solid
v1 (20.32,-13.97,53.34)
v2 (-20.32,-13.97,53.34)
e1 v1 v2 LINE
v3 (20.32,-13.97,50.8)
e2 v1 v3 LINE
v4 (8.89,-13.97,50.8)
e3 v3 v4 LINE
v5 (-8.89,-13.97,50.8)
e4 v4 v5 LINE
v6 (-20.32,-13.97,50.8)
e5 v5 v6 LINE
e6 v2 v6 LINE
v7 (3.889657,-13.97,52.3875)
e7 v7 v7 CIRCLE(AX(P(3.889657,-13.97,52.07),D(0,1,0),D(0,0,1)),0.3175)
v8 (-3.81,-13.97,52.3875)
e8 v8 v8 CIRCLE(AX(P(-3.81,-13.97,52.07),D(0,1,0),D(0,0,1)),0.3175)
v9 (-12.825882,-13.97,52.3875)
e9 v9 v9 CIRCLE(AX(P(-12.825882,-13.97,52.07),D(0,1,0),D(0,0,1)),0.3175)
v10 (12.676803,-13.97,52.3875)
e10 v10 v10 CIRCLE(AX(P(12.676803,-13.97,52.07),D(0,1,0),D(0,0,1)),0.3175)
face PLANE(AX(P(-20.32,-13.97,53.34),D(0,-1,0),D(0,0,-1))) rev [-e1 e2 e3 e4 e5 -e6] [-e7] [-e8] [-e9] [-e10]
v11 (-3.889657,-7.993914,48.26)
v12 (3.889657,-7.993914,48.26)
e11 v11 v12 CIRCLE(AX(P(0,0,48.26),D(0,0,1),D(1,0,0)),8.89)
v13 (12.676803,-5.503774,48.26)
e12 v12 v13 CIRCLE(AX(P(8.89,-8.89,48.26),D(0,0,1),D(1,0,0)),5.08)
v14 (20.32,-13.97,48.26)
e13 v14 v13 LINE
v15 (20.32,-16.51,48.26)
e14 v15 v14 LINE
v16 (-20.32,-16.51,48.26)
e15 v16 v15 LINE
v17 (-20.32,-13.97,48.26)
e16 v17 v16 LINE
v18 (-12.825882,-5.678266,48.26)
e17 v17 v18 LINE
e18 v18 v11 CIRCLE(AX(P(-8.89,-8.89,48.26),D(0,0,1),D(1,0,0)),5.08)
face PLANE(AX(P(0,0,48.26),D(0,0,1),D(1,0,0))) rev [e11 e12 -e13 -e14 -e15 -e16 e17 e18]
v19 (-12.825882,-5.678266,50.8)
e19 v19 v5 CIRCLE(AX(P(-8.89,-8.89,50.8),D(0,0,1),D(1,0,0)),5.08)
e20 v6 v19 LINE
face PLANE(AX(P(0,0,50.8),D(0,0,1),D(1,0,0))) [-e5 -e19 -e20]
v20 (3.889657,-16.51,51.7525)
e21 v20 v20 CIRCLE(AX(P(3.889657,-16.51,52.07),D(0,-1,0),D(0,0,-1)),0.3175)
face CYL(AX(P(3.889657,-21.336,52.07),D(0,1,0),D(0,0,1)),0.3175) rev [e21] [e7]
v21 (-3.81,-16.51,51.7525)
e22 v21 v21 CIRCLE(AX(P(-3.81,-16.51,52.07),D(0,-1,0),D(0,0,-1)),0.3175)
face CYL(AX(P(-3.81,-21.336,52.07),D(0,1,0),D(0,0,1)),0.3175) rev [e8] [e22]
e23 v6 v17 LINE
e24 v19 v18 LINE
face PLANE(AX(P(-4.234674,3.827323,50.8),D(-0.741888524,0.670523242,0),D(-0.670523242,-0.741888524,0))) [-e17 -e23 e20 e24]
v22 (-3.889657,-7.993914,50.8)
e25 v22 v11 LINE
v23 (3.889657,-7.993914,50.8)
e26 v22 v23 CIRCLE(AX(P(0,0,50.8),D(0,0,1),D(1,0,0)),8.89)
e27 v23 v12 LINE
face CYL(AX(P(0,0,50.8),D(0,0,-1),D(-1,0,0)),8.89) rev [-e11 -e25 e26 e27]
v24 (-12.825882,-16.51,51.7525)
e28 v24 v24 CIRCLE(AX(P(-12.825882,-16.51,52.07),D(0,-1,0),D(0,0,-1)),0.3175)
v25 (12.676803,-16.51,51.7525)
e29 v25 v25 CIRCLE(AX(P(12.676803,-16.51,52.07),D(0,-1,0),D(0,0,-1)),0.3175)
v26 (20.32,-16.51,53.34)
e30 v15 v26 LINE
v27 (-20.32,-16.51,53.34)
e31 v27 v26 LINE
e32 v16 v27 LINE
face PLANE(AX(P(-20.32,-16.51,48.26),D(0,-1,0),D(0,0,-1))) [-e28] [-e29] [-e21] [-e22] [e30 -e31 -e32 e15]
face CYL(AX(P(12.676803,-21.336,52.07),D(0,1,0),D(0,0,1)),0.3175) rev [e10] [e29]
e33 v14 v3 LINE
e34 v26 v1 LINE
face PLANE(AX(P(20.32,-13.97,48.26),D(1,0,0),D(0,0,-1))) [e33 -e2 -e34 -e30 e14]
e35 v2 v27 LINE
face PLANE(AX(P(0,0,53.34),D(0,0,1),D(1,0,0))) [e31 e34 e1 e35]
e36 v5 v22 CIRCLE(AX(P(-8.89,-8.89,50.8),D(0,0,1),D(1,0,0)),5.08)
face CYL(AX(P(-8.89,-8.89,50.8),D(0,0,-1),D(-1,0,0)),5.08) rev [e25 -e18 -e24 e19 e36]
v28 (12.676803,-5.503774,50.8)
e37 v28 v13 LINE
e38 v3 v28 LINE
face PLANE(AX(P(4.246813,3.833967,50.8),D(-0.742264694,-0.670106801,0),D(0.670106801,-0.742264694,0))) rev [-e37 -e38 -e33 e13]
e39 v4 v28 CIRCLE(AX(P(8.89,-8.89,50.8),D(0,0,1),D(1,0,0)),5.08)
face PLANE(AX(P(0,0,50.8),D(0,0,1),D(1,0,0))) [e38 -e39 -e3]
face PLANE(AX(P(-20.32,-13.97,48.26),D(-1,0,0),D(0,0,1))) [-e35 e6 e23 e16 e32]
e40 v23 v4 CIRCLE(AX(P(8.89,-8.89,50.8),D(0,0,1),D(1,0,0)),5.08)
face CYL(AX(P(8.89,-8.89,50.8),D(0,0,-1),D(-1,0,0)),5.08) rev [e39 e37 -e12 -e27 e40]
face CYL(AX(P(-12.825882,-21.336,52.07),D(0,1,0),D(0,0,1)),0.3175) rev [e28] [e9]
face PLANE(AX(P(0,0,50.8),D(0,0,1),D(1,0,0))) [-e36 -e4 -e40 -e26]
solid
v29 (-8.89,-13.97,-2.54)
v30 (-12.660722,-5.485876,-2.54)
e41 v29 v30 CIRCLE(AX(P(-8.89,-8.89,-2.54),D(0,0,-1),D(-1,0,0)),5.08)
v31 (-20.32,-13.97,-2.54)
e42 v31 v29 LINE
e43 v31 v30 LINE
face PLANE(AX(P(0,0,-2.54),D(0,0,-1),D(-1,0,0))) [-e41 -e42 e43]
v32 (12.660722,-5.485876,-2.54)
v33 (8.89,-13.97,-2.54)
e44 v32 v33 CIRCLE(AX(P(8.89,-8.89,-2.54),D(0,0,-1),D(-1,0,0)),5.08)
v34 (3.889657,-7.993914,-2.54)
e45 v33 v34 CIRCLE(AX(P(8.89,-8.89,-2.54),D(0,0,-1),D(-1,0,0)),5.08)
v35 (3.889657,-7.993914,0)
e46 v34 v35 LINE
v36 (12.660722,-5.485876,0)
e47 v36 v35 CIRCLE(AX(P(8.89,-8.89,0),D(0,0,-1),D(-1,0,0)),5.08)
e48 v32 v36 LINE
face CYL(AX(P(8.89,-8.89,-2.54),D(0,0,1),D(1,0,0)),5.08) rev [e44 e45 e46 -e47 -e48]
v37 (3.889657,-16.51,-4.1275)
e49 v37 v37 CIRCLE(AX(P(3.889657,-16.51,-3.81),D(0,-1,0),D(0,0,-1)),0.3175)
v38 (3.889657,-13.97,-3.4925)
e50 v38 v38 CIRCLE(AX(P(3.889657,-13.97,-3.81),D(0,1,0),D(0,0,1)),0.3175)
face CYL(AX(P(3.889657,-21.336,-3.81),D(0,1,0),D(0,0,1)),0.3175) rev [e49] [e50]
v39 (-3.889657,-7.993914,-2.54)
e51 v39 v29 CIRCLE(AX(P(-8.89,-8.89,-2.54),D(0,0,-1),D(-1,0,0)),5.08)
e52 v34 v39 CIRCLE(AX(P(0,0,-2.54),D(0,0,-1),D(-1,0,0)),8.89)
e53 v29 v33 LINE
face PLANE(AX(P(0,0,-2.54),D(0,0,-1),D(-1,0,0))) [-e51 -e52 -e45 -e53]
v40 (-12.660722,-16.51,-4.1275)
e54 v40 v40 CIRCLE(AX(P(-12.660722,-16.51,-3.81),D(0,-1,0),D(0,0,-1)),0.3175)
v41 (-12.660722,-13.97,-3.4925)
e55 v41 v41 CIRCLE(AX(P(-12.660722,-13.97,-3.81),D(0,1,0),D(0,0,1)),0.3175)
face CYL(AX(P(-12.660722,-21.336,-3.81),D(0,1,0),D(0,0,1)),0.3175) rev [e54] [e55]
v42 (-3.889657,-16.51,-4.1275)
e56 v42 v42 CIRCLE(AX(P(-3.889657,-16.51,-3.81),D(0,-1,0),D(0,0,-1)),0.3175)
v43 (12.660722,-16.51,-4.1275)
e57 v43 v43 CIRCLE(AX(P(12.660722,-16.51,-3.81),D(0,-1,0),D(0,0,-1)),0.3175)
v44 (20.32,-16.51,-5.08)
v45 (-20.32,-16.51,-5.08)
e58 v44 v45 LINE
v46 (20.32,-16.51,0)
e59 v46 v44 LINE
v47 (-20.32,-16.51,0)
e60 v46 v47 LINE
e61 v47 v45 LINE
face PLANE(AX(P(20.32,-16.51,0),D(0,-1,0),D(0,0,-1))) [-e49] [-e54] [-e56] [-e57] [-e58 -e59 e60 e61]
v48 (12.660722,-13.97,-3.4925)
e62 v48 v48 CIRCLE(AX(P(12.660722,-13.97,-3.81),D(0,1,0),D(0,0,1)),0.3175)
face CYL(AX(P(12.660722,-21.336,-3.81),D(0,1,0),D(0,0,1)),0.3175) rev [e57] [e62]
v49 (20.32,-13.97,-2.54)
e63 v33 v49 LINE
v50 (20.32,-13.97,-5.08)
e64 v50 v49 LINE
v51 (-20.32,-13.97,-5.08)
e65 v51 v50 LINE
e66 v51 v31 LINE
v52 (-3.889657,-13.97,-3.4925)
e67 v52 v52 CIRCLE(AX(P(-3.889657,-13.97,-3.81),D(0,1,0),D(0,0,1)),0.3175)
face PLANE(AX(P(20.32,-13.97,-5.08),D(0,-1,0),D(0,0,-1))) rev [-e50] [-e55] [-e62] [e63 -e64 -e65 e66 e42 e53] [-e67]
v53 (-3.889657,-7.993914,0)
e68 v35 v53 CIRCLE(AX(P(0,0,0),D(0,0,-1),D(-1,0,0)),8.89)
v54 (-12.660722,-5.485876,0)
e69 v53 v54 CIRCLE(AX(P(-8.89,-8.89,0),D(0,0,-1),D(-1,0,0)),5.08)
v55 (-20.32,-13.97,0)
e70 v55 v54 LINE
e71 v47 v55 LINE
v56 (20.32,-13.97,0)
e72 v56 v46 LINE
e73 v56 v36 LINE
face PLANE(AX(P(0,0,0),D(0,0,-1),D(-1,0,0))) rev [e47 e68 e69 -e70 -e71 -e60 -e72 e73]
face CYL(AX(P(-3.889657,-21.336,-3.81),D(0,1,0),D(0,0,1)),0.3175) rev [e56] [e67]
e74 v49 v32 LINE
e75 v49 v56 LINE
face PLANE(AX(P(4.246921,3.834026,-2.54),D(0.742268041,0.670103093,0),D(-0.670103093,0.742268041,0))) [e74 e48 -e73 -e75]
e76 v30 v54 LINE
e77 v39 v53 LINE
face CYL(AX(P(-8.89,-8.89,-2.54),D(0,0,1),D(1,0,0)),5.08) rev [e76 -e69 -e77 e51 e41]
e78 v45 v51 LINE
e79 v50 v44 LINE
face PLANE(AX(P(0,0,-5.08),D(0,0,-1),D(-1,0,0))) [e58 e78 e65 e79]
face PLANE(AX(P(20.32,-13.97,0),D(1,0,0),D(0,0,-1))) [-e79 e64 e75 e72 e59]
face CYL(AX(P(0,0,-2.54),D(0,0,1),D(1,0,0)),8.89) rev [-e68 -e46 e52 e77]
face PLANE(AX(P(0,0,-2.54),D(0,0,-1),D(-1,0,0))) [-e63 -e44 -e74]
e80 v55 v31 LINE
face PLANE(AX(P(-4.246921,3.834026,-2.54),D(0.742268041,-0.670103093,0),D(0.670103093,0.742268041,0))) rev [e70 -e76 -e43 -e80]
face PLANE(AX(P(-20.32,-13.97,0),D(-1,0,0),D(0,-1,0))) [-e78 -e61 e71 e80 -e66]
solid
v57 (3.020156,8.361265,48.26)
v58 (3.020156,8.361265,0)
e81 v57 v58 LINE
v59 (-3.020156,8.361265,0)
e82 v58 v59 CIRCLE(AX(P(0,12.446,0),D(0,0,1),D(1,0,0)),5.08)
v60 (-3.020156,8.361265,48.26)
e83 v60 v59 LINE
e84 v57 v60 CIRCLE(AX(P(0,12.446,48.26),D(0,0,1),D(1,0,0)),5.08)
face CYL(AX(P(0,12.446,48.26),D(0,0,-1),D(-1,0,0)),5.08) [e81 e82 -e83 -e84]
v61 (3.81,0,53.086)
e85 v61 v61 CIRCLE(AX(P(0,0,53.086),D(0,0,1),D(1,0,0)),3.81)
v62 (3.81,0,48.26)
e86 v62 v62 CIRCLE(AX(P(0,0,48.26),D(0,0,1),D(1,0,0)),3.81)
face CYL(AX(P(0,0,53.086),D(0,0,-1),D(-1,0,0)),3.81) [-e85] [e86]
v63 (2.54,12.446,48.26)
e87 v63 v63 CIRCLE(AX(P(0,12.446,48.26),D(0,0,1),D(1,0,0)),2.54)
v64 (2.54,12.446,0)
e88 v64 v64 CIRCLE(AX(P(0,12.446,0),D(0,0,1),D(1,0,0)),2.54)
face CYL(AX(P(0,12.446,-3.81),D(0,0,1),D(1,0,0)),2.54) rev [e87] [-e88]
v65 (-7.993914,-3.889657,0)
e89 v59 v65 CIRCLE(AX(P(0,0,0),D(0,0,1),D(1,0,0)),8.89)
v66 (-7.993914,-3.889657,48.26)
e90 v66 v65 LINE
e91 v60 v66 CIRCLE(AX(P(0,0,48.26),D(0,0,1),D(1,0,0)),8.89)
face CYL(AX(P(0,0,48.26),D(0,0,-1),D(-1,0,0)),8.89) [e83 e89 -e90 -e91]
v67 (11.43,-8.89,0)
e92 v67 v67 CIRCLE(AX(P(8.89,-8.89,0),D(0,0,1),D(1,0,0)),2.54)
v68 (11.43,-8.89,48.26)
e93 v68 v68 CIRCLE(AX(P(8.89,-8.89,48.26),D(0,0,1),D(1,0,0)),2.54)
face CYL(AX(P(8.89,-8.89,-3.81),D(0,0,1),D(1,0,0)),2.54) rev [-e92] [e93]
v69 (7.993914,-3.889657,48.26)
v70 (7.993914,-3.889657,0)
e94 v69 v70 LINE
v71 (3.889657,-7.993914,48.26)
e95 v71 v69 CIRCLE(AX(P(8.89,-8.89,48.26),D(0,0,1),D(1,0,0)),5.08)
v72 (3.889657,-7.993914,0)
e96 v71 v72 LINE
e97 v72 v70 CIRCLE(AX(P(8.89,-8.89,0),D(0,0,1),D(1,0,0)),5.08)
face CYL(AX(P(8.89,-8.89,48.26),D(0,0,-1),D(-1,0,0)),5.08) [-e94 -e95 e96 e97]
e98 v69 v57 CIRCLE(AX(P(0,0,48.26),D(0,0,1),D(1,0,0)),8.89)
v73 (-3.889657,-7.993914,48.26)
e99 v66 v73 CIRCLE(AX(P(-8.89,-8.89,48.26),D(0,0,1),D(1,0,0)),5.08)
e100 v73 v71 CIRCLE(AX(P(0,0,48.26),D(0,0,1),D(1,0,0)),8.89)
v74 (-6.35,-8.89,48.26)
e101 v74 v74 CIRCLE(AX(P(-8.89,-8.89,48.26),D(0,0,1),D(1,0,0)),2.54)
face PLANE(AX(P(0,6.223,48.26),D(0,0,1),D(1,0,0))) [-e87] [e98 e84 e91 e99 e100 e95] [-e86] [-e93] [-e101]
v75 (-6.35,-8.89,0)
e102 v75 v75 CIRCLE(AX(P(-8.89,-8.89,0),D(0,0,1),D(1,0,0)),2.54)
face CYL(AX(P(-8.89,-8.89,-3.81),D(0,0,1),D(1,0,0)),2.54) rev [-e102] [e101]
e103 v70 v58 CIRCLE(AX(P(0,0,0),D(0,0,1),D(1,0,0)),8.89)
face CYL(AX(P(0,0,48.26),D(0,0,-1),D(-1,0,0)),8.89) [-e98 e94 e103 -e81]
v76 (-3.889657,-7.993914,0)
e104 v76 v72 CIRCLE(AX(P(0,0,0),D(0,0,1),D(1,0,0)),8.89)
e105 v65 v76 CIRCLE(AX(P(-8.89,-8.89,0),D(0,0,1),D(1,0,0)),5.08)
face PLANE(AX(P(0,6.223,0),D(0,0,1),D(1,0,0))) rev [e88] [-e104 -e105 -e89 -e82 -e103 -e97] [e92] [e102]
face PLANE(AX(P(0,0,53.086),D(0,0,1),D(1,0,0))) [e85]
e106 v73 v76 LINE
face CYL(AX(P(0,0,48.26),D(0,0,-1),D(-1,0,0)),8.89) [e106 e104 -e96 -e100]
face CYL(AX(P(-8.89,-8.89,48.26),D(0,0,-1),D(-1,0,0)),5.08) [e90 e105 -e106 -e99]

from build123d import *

# Parameters (mm, degrees)
BOSS_EXTRUDE1_DEPTH   = 48.26
SKETCH2_R             = 2.54
CUT_EXTRUDE1_DEPTH    = 52.07
BOSS_EXTRUDE2_DEPTH   = 2.54
BOSS_EXTRUDE5_DEPTH   = 2.54
BOSS_EXTRUDE5_2_DEPTH = 2.54
BOSS_EXTRUDE5_3_DEPTH = 2.54
SKETCH6_W             = 40.64
SKETCH6_H             = 2.54
BOSS_EXTRUDE6_DEPTH   = 2.54
SKETCH7_W             = 40.64
SKETCH7_H             = 2.54
BOSS_EXTRUDE7_DEPTH   = 2.54
SKETCH8_W             = 40.64
SKETCH8_H             = 2.54
BOSS_EXTRUDE8_DEPTH   = 2.54
SKETCH9_W             = 40.64
SKETCH9_H             = 2.54
BOSS_EXTRUDE9_DEPTH   = 2.54
SKETCH10_R            = 0.3175
CUT_EXTRUDE2_DEPTH    = 7.366
SKETCH11_R            = 0.3175
CUT_EXTRUDE3_DEPTH    = 7.366
SKETCH12_R            = 3.81
BOSS_EXTRUDE10_DEPTH  = 4.826


# Read off the part's stored shape, not the designer's step: Boss-Extrude2
with BuildPart() as part:
    # Sketch1 → Boss-Extrude1 (new body)
    with BuildSketch(Plane.XY):
        with BuildLine():
            ThreePointArc((-3.020156036, 8.361265306), (-8.237032921, 3.344157391), (-7.993914493, -3.889656935))
            ThreePointArc((-7.993914493, -3.889656935), (-12.482102448, -12.482102448), (-3.889656935, -7.993914493))
            ThreePointArc((-3.889656935, -7.993914493), (0, -8.89), (3.889656935, -7.993914493))
            ThreePointArc((3.889656935, -7.993914493), (12.482102448, -12.482102448), (7.993914493, -3.889656935))
            ThreePointArc((7.993914493, -3.889656935), (8.237032921, 3.344157391), (3.020156036, 8.361265306))
            ThreePointArc((3.020156036, 8.361265306), (0, 17.526), (-3.020156036, 8.361265306))
        make_face()
    extrude(amount=BOSS_EXTRUDE1_DEPTH)

    # Sketch2 → Cut-Extrude1 (cut)
    with BuildSketch(Plane.XY.offset(48.26)):
        with Locations((0, 12.446)):
            Circle(SKETCH2_R)
        with Locations((-8.89, -8.89)):
            Circle(SKETCH2_R)
        with Locations((8.89, -8.89)):
            Circle(SKETCH2_R)
    extrude(amount=-CUT_EXTRUDE1_DEPTH, mode=Mode.SUBTRACT)



with BuildPart() as body_2:
    # Boss-Extrude2 outline → Boss-Extrude2 (new body)
    with BuildSketch(Plane.XY.offset(48.26)):
        with BuildLine():
            ThreePointArc((-8.89, -13.97), (-13.479227022, -11.068392835), (-12.825881599, -5.678265883))
            Line((-12.825881599, -5.678265883), (-20.32, -13.97))
            Line((-20.32, -13.97), (-8.89, -13.97))
        make_face()
        with BuildLine():
            ThreePointArc((12.676802642, -5.503774115), (13.527263606, -10.964171221), (8.89, -13.97))
            Line((8.89, -13.97), (20.32, -13.97))
            Line((20.32, -13.97), (12.676802642, -5.503774115))
        make_face()
        with BuildLine():
            ThreePointArc((-3.889656935, -7.993914493), (-4.99394338, -12.149929879), (-8.89, -13.97))
            Line((-8.89, -13.97), (8.89, -13.97))
            ThreePointArc((8.89, -13.97), (4.99394338, -12.149929879), (3.889656935, -7.993914493))
            ThreePointArc((3.889656935, -7.993914493), (0, -8.89), (-3.889656935, -7.993914493))
        make_face()
    extrude(amount=BOSS_EXTRUDE2_DEPTH)


with BuildPart() as body_3:
    # Sketch5 → Boss-Extrude5 (new body)
    with BuildSketch(Plane(origin=(0, 0, 0), x_dir=(-1, 0, 0), z_dir=(0, 0, -1))):
        with BuildLine():
            Line((-12.660721649, -5.485876288), (-20.32, -13.97))
            Line((-20.32, -13.97), (-8.89, -13.97))
            ThreePointArc((-8.89, -13.97), (-13.532162667, -10.953183407), (-12.660721649, -5.485876288))
        make_face()
    extrude(amount=BOSS_EXTRUDE5_DEPTH)



with BuildPart() as body_4:
    # Sketch5 → Boss-Extrude5 2 (new body)
    with BuildSketch(Plane(origin=(0, 0, 0), x_dir=(-1, 0, 0), z_dir=(0, 0, -1))):
        with BuildLine():
            ThreePointArc((-3.889656935, -7.993914493), (-4.99394338, -12.149929879), (-8.89, -13.97))
            Line((-8.89, -13.97), (8.89, -13.97))
            ThreePointArc((8.89, -13.97), (4.99394338, -12.149929879), (3.889656935, -7.993914493))
            ThreePointArc((3.889656935, -7.993914493), (0, -8.89), (-3.889656935, -7.993914493))
        make_face()
    extrude(amount=BOSS_EXTRUDE5_2_DEPTH)


with BuildPart() as body_5:
    # Sketch5 → Boss-Extrude5 3 (new body)
    with BuildSketch(Plane(origin=(0, 0, 0), x_dir=(-1, 0, 0), z_dir=(0, 0, -1))):
        with BuildLine():
            ThreePointArc((12.660721649, -5.485876288), (13.532162667, -10.953183407), (8.89, -13.97))
            Line((8.89, -13.97), (20.32, -13.97))
            Line((20.32, -13.97), (12.660721649, -5.485876288))
        make_face()
    extrude(amount=BOSS_EXTRUDE5_3_DEPTH)


with BuildPart() as part_1:
    add(part.part)

    add(body_2.part)  # Boss-Extrude6 merges body 2
    # Sketch6 → Boss-Extrude6 (add)
    with BuildSketch(Plane.XY.offset(50.8)):
        with Locations((0, -15.24)):
            Rectangle(SKETCH6_W, SKETCH6_H)
    extrude(amount=-BOSS_EXTRUDE6_DEPTH)

    # Sketch7 → Boss-Extrude7 (add)
    with BuildSketch(Plane.XY.offset(50.8)):
        with Locations((0, -15.24)):
            Rectangle(SKETCH7_W, SKETCH7_H)
    extrude(amount=BOSS_EXTRUDE7_DEPTH)

    # Sketch11 → Cut-Extrude3 (cut)
    with BuildSketch(Plane(origin=(0, -13.97, 0), x_dir=(1, 0, 0), z_dir=(0, 1, 0))):
        with Locations(Location((-12.825881599, -52.07, 0), (0, 0, 270))):
            Circle(SKETCH11_R)
        with Locations(Location((-3.81, -52.07, 0), (0, 0, 270))):
            Circle(SKETCH11_R)
        with Locations(Location((3.889656935, -52.07, 0), (0, 0, 270))):
            Circle(SKETCH11_R)
        with Locations(Location((12.676802642, -52.07, 0), (0, 0, 270))):
            Circle(SKETCH11_R)
    extrude(amount=-CUT_EXTRUDE3_DEPTH, mode=Mode.SUBTRACT)

    # Sketch12 → Boss-Extrude10 (add)
    with BuildSketch(Plane.XY.offset(48.26)):
        Circle(SKETCH12_R)
    extrude(amount=BOSS_EXTRUDE10_DEPTH)


with BuildPart() as body_3_1:
    add(body_3.part)

    add(body_4.part)  # Boss-Extrude8 merges body 4

    add(body_5.part)  # Boss-Extrude8 merges body 5
    # Sketch8 → Boss-Extrude8 (add)
    with BuildSketch(Plane(origin=(0, 0, -2.54), x_dir=(-1, 0, 0), z_dir=(0, 0, -1))):
        with Locations((0, -15.24)):
            Rectangle(SKETCH8_W, SKETCH8_H)
    extrude(amount=-BOSS_EXTRUDE8_DEPTH)

    # Sketch9 → Boss-Extrude9 (add)
    with BuildSketch(Plane(origin=(0, 0, -2.54), x_dir=(-1, 0, 0), z_dir=(0, 0, -1))):
        with Locations((0, -15.24)):
            Rectangle(SKETCH9_W, SKETCH9_H)
    extrude(amount=BOSS_EXTRUDE9_DEPTH)

    # Sketch10 → Cut-Extrude2 (cut)
    with BuildSketch(Plane(origin=(0, -13.97, 0), x_dir=(1, 0, 0), z_dir=(0, 1, 0))):
        with Locations(Location((-12.660721649, 3.81, 0), (0, 0, 270))):
            Circle(SKETCH10_R)
        with Locations(Location((-3.889656935, 3.81, 0), (0, 0, 270))):
            Circle(SKETCH10_R)
        with Locations(Location((3.889656935, 3.81, 0), (0, 0, 270))):
            Circle(SKETCH10_R)
        with Locations(Location((12.660721649, 3.81, 0), (0, 0, 270))):
            Circle(SKETCH10_R)
    extrude(amount=-CUT_EXTRUDE2_DEPTH, mode=Mode.SUBTRACT)


solid = Compound([part_1.part, body_3_1.part])
